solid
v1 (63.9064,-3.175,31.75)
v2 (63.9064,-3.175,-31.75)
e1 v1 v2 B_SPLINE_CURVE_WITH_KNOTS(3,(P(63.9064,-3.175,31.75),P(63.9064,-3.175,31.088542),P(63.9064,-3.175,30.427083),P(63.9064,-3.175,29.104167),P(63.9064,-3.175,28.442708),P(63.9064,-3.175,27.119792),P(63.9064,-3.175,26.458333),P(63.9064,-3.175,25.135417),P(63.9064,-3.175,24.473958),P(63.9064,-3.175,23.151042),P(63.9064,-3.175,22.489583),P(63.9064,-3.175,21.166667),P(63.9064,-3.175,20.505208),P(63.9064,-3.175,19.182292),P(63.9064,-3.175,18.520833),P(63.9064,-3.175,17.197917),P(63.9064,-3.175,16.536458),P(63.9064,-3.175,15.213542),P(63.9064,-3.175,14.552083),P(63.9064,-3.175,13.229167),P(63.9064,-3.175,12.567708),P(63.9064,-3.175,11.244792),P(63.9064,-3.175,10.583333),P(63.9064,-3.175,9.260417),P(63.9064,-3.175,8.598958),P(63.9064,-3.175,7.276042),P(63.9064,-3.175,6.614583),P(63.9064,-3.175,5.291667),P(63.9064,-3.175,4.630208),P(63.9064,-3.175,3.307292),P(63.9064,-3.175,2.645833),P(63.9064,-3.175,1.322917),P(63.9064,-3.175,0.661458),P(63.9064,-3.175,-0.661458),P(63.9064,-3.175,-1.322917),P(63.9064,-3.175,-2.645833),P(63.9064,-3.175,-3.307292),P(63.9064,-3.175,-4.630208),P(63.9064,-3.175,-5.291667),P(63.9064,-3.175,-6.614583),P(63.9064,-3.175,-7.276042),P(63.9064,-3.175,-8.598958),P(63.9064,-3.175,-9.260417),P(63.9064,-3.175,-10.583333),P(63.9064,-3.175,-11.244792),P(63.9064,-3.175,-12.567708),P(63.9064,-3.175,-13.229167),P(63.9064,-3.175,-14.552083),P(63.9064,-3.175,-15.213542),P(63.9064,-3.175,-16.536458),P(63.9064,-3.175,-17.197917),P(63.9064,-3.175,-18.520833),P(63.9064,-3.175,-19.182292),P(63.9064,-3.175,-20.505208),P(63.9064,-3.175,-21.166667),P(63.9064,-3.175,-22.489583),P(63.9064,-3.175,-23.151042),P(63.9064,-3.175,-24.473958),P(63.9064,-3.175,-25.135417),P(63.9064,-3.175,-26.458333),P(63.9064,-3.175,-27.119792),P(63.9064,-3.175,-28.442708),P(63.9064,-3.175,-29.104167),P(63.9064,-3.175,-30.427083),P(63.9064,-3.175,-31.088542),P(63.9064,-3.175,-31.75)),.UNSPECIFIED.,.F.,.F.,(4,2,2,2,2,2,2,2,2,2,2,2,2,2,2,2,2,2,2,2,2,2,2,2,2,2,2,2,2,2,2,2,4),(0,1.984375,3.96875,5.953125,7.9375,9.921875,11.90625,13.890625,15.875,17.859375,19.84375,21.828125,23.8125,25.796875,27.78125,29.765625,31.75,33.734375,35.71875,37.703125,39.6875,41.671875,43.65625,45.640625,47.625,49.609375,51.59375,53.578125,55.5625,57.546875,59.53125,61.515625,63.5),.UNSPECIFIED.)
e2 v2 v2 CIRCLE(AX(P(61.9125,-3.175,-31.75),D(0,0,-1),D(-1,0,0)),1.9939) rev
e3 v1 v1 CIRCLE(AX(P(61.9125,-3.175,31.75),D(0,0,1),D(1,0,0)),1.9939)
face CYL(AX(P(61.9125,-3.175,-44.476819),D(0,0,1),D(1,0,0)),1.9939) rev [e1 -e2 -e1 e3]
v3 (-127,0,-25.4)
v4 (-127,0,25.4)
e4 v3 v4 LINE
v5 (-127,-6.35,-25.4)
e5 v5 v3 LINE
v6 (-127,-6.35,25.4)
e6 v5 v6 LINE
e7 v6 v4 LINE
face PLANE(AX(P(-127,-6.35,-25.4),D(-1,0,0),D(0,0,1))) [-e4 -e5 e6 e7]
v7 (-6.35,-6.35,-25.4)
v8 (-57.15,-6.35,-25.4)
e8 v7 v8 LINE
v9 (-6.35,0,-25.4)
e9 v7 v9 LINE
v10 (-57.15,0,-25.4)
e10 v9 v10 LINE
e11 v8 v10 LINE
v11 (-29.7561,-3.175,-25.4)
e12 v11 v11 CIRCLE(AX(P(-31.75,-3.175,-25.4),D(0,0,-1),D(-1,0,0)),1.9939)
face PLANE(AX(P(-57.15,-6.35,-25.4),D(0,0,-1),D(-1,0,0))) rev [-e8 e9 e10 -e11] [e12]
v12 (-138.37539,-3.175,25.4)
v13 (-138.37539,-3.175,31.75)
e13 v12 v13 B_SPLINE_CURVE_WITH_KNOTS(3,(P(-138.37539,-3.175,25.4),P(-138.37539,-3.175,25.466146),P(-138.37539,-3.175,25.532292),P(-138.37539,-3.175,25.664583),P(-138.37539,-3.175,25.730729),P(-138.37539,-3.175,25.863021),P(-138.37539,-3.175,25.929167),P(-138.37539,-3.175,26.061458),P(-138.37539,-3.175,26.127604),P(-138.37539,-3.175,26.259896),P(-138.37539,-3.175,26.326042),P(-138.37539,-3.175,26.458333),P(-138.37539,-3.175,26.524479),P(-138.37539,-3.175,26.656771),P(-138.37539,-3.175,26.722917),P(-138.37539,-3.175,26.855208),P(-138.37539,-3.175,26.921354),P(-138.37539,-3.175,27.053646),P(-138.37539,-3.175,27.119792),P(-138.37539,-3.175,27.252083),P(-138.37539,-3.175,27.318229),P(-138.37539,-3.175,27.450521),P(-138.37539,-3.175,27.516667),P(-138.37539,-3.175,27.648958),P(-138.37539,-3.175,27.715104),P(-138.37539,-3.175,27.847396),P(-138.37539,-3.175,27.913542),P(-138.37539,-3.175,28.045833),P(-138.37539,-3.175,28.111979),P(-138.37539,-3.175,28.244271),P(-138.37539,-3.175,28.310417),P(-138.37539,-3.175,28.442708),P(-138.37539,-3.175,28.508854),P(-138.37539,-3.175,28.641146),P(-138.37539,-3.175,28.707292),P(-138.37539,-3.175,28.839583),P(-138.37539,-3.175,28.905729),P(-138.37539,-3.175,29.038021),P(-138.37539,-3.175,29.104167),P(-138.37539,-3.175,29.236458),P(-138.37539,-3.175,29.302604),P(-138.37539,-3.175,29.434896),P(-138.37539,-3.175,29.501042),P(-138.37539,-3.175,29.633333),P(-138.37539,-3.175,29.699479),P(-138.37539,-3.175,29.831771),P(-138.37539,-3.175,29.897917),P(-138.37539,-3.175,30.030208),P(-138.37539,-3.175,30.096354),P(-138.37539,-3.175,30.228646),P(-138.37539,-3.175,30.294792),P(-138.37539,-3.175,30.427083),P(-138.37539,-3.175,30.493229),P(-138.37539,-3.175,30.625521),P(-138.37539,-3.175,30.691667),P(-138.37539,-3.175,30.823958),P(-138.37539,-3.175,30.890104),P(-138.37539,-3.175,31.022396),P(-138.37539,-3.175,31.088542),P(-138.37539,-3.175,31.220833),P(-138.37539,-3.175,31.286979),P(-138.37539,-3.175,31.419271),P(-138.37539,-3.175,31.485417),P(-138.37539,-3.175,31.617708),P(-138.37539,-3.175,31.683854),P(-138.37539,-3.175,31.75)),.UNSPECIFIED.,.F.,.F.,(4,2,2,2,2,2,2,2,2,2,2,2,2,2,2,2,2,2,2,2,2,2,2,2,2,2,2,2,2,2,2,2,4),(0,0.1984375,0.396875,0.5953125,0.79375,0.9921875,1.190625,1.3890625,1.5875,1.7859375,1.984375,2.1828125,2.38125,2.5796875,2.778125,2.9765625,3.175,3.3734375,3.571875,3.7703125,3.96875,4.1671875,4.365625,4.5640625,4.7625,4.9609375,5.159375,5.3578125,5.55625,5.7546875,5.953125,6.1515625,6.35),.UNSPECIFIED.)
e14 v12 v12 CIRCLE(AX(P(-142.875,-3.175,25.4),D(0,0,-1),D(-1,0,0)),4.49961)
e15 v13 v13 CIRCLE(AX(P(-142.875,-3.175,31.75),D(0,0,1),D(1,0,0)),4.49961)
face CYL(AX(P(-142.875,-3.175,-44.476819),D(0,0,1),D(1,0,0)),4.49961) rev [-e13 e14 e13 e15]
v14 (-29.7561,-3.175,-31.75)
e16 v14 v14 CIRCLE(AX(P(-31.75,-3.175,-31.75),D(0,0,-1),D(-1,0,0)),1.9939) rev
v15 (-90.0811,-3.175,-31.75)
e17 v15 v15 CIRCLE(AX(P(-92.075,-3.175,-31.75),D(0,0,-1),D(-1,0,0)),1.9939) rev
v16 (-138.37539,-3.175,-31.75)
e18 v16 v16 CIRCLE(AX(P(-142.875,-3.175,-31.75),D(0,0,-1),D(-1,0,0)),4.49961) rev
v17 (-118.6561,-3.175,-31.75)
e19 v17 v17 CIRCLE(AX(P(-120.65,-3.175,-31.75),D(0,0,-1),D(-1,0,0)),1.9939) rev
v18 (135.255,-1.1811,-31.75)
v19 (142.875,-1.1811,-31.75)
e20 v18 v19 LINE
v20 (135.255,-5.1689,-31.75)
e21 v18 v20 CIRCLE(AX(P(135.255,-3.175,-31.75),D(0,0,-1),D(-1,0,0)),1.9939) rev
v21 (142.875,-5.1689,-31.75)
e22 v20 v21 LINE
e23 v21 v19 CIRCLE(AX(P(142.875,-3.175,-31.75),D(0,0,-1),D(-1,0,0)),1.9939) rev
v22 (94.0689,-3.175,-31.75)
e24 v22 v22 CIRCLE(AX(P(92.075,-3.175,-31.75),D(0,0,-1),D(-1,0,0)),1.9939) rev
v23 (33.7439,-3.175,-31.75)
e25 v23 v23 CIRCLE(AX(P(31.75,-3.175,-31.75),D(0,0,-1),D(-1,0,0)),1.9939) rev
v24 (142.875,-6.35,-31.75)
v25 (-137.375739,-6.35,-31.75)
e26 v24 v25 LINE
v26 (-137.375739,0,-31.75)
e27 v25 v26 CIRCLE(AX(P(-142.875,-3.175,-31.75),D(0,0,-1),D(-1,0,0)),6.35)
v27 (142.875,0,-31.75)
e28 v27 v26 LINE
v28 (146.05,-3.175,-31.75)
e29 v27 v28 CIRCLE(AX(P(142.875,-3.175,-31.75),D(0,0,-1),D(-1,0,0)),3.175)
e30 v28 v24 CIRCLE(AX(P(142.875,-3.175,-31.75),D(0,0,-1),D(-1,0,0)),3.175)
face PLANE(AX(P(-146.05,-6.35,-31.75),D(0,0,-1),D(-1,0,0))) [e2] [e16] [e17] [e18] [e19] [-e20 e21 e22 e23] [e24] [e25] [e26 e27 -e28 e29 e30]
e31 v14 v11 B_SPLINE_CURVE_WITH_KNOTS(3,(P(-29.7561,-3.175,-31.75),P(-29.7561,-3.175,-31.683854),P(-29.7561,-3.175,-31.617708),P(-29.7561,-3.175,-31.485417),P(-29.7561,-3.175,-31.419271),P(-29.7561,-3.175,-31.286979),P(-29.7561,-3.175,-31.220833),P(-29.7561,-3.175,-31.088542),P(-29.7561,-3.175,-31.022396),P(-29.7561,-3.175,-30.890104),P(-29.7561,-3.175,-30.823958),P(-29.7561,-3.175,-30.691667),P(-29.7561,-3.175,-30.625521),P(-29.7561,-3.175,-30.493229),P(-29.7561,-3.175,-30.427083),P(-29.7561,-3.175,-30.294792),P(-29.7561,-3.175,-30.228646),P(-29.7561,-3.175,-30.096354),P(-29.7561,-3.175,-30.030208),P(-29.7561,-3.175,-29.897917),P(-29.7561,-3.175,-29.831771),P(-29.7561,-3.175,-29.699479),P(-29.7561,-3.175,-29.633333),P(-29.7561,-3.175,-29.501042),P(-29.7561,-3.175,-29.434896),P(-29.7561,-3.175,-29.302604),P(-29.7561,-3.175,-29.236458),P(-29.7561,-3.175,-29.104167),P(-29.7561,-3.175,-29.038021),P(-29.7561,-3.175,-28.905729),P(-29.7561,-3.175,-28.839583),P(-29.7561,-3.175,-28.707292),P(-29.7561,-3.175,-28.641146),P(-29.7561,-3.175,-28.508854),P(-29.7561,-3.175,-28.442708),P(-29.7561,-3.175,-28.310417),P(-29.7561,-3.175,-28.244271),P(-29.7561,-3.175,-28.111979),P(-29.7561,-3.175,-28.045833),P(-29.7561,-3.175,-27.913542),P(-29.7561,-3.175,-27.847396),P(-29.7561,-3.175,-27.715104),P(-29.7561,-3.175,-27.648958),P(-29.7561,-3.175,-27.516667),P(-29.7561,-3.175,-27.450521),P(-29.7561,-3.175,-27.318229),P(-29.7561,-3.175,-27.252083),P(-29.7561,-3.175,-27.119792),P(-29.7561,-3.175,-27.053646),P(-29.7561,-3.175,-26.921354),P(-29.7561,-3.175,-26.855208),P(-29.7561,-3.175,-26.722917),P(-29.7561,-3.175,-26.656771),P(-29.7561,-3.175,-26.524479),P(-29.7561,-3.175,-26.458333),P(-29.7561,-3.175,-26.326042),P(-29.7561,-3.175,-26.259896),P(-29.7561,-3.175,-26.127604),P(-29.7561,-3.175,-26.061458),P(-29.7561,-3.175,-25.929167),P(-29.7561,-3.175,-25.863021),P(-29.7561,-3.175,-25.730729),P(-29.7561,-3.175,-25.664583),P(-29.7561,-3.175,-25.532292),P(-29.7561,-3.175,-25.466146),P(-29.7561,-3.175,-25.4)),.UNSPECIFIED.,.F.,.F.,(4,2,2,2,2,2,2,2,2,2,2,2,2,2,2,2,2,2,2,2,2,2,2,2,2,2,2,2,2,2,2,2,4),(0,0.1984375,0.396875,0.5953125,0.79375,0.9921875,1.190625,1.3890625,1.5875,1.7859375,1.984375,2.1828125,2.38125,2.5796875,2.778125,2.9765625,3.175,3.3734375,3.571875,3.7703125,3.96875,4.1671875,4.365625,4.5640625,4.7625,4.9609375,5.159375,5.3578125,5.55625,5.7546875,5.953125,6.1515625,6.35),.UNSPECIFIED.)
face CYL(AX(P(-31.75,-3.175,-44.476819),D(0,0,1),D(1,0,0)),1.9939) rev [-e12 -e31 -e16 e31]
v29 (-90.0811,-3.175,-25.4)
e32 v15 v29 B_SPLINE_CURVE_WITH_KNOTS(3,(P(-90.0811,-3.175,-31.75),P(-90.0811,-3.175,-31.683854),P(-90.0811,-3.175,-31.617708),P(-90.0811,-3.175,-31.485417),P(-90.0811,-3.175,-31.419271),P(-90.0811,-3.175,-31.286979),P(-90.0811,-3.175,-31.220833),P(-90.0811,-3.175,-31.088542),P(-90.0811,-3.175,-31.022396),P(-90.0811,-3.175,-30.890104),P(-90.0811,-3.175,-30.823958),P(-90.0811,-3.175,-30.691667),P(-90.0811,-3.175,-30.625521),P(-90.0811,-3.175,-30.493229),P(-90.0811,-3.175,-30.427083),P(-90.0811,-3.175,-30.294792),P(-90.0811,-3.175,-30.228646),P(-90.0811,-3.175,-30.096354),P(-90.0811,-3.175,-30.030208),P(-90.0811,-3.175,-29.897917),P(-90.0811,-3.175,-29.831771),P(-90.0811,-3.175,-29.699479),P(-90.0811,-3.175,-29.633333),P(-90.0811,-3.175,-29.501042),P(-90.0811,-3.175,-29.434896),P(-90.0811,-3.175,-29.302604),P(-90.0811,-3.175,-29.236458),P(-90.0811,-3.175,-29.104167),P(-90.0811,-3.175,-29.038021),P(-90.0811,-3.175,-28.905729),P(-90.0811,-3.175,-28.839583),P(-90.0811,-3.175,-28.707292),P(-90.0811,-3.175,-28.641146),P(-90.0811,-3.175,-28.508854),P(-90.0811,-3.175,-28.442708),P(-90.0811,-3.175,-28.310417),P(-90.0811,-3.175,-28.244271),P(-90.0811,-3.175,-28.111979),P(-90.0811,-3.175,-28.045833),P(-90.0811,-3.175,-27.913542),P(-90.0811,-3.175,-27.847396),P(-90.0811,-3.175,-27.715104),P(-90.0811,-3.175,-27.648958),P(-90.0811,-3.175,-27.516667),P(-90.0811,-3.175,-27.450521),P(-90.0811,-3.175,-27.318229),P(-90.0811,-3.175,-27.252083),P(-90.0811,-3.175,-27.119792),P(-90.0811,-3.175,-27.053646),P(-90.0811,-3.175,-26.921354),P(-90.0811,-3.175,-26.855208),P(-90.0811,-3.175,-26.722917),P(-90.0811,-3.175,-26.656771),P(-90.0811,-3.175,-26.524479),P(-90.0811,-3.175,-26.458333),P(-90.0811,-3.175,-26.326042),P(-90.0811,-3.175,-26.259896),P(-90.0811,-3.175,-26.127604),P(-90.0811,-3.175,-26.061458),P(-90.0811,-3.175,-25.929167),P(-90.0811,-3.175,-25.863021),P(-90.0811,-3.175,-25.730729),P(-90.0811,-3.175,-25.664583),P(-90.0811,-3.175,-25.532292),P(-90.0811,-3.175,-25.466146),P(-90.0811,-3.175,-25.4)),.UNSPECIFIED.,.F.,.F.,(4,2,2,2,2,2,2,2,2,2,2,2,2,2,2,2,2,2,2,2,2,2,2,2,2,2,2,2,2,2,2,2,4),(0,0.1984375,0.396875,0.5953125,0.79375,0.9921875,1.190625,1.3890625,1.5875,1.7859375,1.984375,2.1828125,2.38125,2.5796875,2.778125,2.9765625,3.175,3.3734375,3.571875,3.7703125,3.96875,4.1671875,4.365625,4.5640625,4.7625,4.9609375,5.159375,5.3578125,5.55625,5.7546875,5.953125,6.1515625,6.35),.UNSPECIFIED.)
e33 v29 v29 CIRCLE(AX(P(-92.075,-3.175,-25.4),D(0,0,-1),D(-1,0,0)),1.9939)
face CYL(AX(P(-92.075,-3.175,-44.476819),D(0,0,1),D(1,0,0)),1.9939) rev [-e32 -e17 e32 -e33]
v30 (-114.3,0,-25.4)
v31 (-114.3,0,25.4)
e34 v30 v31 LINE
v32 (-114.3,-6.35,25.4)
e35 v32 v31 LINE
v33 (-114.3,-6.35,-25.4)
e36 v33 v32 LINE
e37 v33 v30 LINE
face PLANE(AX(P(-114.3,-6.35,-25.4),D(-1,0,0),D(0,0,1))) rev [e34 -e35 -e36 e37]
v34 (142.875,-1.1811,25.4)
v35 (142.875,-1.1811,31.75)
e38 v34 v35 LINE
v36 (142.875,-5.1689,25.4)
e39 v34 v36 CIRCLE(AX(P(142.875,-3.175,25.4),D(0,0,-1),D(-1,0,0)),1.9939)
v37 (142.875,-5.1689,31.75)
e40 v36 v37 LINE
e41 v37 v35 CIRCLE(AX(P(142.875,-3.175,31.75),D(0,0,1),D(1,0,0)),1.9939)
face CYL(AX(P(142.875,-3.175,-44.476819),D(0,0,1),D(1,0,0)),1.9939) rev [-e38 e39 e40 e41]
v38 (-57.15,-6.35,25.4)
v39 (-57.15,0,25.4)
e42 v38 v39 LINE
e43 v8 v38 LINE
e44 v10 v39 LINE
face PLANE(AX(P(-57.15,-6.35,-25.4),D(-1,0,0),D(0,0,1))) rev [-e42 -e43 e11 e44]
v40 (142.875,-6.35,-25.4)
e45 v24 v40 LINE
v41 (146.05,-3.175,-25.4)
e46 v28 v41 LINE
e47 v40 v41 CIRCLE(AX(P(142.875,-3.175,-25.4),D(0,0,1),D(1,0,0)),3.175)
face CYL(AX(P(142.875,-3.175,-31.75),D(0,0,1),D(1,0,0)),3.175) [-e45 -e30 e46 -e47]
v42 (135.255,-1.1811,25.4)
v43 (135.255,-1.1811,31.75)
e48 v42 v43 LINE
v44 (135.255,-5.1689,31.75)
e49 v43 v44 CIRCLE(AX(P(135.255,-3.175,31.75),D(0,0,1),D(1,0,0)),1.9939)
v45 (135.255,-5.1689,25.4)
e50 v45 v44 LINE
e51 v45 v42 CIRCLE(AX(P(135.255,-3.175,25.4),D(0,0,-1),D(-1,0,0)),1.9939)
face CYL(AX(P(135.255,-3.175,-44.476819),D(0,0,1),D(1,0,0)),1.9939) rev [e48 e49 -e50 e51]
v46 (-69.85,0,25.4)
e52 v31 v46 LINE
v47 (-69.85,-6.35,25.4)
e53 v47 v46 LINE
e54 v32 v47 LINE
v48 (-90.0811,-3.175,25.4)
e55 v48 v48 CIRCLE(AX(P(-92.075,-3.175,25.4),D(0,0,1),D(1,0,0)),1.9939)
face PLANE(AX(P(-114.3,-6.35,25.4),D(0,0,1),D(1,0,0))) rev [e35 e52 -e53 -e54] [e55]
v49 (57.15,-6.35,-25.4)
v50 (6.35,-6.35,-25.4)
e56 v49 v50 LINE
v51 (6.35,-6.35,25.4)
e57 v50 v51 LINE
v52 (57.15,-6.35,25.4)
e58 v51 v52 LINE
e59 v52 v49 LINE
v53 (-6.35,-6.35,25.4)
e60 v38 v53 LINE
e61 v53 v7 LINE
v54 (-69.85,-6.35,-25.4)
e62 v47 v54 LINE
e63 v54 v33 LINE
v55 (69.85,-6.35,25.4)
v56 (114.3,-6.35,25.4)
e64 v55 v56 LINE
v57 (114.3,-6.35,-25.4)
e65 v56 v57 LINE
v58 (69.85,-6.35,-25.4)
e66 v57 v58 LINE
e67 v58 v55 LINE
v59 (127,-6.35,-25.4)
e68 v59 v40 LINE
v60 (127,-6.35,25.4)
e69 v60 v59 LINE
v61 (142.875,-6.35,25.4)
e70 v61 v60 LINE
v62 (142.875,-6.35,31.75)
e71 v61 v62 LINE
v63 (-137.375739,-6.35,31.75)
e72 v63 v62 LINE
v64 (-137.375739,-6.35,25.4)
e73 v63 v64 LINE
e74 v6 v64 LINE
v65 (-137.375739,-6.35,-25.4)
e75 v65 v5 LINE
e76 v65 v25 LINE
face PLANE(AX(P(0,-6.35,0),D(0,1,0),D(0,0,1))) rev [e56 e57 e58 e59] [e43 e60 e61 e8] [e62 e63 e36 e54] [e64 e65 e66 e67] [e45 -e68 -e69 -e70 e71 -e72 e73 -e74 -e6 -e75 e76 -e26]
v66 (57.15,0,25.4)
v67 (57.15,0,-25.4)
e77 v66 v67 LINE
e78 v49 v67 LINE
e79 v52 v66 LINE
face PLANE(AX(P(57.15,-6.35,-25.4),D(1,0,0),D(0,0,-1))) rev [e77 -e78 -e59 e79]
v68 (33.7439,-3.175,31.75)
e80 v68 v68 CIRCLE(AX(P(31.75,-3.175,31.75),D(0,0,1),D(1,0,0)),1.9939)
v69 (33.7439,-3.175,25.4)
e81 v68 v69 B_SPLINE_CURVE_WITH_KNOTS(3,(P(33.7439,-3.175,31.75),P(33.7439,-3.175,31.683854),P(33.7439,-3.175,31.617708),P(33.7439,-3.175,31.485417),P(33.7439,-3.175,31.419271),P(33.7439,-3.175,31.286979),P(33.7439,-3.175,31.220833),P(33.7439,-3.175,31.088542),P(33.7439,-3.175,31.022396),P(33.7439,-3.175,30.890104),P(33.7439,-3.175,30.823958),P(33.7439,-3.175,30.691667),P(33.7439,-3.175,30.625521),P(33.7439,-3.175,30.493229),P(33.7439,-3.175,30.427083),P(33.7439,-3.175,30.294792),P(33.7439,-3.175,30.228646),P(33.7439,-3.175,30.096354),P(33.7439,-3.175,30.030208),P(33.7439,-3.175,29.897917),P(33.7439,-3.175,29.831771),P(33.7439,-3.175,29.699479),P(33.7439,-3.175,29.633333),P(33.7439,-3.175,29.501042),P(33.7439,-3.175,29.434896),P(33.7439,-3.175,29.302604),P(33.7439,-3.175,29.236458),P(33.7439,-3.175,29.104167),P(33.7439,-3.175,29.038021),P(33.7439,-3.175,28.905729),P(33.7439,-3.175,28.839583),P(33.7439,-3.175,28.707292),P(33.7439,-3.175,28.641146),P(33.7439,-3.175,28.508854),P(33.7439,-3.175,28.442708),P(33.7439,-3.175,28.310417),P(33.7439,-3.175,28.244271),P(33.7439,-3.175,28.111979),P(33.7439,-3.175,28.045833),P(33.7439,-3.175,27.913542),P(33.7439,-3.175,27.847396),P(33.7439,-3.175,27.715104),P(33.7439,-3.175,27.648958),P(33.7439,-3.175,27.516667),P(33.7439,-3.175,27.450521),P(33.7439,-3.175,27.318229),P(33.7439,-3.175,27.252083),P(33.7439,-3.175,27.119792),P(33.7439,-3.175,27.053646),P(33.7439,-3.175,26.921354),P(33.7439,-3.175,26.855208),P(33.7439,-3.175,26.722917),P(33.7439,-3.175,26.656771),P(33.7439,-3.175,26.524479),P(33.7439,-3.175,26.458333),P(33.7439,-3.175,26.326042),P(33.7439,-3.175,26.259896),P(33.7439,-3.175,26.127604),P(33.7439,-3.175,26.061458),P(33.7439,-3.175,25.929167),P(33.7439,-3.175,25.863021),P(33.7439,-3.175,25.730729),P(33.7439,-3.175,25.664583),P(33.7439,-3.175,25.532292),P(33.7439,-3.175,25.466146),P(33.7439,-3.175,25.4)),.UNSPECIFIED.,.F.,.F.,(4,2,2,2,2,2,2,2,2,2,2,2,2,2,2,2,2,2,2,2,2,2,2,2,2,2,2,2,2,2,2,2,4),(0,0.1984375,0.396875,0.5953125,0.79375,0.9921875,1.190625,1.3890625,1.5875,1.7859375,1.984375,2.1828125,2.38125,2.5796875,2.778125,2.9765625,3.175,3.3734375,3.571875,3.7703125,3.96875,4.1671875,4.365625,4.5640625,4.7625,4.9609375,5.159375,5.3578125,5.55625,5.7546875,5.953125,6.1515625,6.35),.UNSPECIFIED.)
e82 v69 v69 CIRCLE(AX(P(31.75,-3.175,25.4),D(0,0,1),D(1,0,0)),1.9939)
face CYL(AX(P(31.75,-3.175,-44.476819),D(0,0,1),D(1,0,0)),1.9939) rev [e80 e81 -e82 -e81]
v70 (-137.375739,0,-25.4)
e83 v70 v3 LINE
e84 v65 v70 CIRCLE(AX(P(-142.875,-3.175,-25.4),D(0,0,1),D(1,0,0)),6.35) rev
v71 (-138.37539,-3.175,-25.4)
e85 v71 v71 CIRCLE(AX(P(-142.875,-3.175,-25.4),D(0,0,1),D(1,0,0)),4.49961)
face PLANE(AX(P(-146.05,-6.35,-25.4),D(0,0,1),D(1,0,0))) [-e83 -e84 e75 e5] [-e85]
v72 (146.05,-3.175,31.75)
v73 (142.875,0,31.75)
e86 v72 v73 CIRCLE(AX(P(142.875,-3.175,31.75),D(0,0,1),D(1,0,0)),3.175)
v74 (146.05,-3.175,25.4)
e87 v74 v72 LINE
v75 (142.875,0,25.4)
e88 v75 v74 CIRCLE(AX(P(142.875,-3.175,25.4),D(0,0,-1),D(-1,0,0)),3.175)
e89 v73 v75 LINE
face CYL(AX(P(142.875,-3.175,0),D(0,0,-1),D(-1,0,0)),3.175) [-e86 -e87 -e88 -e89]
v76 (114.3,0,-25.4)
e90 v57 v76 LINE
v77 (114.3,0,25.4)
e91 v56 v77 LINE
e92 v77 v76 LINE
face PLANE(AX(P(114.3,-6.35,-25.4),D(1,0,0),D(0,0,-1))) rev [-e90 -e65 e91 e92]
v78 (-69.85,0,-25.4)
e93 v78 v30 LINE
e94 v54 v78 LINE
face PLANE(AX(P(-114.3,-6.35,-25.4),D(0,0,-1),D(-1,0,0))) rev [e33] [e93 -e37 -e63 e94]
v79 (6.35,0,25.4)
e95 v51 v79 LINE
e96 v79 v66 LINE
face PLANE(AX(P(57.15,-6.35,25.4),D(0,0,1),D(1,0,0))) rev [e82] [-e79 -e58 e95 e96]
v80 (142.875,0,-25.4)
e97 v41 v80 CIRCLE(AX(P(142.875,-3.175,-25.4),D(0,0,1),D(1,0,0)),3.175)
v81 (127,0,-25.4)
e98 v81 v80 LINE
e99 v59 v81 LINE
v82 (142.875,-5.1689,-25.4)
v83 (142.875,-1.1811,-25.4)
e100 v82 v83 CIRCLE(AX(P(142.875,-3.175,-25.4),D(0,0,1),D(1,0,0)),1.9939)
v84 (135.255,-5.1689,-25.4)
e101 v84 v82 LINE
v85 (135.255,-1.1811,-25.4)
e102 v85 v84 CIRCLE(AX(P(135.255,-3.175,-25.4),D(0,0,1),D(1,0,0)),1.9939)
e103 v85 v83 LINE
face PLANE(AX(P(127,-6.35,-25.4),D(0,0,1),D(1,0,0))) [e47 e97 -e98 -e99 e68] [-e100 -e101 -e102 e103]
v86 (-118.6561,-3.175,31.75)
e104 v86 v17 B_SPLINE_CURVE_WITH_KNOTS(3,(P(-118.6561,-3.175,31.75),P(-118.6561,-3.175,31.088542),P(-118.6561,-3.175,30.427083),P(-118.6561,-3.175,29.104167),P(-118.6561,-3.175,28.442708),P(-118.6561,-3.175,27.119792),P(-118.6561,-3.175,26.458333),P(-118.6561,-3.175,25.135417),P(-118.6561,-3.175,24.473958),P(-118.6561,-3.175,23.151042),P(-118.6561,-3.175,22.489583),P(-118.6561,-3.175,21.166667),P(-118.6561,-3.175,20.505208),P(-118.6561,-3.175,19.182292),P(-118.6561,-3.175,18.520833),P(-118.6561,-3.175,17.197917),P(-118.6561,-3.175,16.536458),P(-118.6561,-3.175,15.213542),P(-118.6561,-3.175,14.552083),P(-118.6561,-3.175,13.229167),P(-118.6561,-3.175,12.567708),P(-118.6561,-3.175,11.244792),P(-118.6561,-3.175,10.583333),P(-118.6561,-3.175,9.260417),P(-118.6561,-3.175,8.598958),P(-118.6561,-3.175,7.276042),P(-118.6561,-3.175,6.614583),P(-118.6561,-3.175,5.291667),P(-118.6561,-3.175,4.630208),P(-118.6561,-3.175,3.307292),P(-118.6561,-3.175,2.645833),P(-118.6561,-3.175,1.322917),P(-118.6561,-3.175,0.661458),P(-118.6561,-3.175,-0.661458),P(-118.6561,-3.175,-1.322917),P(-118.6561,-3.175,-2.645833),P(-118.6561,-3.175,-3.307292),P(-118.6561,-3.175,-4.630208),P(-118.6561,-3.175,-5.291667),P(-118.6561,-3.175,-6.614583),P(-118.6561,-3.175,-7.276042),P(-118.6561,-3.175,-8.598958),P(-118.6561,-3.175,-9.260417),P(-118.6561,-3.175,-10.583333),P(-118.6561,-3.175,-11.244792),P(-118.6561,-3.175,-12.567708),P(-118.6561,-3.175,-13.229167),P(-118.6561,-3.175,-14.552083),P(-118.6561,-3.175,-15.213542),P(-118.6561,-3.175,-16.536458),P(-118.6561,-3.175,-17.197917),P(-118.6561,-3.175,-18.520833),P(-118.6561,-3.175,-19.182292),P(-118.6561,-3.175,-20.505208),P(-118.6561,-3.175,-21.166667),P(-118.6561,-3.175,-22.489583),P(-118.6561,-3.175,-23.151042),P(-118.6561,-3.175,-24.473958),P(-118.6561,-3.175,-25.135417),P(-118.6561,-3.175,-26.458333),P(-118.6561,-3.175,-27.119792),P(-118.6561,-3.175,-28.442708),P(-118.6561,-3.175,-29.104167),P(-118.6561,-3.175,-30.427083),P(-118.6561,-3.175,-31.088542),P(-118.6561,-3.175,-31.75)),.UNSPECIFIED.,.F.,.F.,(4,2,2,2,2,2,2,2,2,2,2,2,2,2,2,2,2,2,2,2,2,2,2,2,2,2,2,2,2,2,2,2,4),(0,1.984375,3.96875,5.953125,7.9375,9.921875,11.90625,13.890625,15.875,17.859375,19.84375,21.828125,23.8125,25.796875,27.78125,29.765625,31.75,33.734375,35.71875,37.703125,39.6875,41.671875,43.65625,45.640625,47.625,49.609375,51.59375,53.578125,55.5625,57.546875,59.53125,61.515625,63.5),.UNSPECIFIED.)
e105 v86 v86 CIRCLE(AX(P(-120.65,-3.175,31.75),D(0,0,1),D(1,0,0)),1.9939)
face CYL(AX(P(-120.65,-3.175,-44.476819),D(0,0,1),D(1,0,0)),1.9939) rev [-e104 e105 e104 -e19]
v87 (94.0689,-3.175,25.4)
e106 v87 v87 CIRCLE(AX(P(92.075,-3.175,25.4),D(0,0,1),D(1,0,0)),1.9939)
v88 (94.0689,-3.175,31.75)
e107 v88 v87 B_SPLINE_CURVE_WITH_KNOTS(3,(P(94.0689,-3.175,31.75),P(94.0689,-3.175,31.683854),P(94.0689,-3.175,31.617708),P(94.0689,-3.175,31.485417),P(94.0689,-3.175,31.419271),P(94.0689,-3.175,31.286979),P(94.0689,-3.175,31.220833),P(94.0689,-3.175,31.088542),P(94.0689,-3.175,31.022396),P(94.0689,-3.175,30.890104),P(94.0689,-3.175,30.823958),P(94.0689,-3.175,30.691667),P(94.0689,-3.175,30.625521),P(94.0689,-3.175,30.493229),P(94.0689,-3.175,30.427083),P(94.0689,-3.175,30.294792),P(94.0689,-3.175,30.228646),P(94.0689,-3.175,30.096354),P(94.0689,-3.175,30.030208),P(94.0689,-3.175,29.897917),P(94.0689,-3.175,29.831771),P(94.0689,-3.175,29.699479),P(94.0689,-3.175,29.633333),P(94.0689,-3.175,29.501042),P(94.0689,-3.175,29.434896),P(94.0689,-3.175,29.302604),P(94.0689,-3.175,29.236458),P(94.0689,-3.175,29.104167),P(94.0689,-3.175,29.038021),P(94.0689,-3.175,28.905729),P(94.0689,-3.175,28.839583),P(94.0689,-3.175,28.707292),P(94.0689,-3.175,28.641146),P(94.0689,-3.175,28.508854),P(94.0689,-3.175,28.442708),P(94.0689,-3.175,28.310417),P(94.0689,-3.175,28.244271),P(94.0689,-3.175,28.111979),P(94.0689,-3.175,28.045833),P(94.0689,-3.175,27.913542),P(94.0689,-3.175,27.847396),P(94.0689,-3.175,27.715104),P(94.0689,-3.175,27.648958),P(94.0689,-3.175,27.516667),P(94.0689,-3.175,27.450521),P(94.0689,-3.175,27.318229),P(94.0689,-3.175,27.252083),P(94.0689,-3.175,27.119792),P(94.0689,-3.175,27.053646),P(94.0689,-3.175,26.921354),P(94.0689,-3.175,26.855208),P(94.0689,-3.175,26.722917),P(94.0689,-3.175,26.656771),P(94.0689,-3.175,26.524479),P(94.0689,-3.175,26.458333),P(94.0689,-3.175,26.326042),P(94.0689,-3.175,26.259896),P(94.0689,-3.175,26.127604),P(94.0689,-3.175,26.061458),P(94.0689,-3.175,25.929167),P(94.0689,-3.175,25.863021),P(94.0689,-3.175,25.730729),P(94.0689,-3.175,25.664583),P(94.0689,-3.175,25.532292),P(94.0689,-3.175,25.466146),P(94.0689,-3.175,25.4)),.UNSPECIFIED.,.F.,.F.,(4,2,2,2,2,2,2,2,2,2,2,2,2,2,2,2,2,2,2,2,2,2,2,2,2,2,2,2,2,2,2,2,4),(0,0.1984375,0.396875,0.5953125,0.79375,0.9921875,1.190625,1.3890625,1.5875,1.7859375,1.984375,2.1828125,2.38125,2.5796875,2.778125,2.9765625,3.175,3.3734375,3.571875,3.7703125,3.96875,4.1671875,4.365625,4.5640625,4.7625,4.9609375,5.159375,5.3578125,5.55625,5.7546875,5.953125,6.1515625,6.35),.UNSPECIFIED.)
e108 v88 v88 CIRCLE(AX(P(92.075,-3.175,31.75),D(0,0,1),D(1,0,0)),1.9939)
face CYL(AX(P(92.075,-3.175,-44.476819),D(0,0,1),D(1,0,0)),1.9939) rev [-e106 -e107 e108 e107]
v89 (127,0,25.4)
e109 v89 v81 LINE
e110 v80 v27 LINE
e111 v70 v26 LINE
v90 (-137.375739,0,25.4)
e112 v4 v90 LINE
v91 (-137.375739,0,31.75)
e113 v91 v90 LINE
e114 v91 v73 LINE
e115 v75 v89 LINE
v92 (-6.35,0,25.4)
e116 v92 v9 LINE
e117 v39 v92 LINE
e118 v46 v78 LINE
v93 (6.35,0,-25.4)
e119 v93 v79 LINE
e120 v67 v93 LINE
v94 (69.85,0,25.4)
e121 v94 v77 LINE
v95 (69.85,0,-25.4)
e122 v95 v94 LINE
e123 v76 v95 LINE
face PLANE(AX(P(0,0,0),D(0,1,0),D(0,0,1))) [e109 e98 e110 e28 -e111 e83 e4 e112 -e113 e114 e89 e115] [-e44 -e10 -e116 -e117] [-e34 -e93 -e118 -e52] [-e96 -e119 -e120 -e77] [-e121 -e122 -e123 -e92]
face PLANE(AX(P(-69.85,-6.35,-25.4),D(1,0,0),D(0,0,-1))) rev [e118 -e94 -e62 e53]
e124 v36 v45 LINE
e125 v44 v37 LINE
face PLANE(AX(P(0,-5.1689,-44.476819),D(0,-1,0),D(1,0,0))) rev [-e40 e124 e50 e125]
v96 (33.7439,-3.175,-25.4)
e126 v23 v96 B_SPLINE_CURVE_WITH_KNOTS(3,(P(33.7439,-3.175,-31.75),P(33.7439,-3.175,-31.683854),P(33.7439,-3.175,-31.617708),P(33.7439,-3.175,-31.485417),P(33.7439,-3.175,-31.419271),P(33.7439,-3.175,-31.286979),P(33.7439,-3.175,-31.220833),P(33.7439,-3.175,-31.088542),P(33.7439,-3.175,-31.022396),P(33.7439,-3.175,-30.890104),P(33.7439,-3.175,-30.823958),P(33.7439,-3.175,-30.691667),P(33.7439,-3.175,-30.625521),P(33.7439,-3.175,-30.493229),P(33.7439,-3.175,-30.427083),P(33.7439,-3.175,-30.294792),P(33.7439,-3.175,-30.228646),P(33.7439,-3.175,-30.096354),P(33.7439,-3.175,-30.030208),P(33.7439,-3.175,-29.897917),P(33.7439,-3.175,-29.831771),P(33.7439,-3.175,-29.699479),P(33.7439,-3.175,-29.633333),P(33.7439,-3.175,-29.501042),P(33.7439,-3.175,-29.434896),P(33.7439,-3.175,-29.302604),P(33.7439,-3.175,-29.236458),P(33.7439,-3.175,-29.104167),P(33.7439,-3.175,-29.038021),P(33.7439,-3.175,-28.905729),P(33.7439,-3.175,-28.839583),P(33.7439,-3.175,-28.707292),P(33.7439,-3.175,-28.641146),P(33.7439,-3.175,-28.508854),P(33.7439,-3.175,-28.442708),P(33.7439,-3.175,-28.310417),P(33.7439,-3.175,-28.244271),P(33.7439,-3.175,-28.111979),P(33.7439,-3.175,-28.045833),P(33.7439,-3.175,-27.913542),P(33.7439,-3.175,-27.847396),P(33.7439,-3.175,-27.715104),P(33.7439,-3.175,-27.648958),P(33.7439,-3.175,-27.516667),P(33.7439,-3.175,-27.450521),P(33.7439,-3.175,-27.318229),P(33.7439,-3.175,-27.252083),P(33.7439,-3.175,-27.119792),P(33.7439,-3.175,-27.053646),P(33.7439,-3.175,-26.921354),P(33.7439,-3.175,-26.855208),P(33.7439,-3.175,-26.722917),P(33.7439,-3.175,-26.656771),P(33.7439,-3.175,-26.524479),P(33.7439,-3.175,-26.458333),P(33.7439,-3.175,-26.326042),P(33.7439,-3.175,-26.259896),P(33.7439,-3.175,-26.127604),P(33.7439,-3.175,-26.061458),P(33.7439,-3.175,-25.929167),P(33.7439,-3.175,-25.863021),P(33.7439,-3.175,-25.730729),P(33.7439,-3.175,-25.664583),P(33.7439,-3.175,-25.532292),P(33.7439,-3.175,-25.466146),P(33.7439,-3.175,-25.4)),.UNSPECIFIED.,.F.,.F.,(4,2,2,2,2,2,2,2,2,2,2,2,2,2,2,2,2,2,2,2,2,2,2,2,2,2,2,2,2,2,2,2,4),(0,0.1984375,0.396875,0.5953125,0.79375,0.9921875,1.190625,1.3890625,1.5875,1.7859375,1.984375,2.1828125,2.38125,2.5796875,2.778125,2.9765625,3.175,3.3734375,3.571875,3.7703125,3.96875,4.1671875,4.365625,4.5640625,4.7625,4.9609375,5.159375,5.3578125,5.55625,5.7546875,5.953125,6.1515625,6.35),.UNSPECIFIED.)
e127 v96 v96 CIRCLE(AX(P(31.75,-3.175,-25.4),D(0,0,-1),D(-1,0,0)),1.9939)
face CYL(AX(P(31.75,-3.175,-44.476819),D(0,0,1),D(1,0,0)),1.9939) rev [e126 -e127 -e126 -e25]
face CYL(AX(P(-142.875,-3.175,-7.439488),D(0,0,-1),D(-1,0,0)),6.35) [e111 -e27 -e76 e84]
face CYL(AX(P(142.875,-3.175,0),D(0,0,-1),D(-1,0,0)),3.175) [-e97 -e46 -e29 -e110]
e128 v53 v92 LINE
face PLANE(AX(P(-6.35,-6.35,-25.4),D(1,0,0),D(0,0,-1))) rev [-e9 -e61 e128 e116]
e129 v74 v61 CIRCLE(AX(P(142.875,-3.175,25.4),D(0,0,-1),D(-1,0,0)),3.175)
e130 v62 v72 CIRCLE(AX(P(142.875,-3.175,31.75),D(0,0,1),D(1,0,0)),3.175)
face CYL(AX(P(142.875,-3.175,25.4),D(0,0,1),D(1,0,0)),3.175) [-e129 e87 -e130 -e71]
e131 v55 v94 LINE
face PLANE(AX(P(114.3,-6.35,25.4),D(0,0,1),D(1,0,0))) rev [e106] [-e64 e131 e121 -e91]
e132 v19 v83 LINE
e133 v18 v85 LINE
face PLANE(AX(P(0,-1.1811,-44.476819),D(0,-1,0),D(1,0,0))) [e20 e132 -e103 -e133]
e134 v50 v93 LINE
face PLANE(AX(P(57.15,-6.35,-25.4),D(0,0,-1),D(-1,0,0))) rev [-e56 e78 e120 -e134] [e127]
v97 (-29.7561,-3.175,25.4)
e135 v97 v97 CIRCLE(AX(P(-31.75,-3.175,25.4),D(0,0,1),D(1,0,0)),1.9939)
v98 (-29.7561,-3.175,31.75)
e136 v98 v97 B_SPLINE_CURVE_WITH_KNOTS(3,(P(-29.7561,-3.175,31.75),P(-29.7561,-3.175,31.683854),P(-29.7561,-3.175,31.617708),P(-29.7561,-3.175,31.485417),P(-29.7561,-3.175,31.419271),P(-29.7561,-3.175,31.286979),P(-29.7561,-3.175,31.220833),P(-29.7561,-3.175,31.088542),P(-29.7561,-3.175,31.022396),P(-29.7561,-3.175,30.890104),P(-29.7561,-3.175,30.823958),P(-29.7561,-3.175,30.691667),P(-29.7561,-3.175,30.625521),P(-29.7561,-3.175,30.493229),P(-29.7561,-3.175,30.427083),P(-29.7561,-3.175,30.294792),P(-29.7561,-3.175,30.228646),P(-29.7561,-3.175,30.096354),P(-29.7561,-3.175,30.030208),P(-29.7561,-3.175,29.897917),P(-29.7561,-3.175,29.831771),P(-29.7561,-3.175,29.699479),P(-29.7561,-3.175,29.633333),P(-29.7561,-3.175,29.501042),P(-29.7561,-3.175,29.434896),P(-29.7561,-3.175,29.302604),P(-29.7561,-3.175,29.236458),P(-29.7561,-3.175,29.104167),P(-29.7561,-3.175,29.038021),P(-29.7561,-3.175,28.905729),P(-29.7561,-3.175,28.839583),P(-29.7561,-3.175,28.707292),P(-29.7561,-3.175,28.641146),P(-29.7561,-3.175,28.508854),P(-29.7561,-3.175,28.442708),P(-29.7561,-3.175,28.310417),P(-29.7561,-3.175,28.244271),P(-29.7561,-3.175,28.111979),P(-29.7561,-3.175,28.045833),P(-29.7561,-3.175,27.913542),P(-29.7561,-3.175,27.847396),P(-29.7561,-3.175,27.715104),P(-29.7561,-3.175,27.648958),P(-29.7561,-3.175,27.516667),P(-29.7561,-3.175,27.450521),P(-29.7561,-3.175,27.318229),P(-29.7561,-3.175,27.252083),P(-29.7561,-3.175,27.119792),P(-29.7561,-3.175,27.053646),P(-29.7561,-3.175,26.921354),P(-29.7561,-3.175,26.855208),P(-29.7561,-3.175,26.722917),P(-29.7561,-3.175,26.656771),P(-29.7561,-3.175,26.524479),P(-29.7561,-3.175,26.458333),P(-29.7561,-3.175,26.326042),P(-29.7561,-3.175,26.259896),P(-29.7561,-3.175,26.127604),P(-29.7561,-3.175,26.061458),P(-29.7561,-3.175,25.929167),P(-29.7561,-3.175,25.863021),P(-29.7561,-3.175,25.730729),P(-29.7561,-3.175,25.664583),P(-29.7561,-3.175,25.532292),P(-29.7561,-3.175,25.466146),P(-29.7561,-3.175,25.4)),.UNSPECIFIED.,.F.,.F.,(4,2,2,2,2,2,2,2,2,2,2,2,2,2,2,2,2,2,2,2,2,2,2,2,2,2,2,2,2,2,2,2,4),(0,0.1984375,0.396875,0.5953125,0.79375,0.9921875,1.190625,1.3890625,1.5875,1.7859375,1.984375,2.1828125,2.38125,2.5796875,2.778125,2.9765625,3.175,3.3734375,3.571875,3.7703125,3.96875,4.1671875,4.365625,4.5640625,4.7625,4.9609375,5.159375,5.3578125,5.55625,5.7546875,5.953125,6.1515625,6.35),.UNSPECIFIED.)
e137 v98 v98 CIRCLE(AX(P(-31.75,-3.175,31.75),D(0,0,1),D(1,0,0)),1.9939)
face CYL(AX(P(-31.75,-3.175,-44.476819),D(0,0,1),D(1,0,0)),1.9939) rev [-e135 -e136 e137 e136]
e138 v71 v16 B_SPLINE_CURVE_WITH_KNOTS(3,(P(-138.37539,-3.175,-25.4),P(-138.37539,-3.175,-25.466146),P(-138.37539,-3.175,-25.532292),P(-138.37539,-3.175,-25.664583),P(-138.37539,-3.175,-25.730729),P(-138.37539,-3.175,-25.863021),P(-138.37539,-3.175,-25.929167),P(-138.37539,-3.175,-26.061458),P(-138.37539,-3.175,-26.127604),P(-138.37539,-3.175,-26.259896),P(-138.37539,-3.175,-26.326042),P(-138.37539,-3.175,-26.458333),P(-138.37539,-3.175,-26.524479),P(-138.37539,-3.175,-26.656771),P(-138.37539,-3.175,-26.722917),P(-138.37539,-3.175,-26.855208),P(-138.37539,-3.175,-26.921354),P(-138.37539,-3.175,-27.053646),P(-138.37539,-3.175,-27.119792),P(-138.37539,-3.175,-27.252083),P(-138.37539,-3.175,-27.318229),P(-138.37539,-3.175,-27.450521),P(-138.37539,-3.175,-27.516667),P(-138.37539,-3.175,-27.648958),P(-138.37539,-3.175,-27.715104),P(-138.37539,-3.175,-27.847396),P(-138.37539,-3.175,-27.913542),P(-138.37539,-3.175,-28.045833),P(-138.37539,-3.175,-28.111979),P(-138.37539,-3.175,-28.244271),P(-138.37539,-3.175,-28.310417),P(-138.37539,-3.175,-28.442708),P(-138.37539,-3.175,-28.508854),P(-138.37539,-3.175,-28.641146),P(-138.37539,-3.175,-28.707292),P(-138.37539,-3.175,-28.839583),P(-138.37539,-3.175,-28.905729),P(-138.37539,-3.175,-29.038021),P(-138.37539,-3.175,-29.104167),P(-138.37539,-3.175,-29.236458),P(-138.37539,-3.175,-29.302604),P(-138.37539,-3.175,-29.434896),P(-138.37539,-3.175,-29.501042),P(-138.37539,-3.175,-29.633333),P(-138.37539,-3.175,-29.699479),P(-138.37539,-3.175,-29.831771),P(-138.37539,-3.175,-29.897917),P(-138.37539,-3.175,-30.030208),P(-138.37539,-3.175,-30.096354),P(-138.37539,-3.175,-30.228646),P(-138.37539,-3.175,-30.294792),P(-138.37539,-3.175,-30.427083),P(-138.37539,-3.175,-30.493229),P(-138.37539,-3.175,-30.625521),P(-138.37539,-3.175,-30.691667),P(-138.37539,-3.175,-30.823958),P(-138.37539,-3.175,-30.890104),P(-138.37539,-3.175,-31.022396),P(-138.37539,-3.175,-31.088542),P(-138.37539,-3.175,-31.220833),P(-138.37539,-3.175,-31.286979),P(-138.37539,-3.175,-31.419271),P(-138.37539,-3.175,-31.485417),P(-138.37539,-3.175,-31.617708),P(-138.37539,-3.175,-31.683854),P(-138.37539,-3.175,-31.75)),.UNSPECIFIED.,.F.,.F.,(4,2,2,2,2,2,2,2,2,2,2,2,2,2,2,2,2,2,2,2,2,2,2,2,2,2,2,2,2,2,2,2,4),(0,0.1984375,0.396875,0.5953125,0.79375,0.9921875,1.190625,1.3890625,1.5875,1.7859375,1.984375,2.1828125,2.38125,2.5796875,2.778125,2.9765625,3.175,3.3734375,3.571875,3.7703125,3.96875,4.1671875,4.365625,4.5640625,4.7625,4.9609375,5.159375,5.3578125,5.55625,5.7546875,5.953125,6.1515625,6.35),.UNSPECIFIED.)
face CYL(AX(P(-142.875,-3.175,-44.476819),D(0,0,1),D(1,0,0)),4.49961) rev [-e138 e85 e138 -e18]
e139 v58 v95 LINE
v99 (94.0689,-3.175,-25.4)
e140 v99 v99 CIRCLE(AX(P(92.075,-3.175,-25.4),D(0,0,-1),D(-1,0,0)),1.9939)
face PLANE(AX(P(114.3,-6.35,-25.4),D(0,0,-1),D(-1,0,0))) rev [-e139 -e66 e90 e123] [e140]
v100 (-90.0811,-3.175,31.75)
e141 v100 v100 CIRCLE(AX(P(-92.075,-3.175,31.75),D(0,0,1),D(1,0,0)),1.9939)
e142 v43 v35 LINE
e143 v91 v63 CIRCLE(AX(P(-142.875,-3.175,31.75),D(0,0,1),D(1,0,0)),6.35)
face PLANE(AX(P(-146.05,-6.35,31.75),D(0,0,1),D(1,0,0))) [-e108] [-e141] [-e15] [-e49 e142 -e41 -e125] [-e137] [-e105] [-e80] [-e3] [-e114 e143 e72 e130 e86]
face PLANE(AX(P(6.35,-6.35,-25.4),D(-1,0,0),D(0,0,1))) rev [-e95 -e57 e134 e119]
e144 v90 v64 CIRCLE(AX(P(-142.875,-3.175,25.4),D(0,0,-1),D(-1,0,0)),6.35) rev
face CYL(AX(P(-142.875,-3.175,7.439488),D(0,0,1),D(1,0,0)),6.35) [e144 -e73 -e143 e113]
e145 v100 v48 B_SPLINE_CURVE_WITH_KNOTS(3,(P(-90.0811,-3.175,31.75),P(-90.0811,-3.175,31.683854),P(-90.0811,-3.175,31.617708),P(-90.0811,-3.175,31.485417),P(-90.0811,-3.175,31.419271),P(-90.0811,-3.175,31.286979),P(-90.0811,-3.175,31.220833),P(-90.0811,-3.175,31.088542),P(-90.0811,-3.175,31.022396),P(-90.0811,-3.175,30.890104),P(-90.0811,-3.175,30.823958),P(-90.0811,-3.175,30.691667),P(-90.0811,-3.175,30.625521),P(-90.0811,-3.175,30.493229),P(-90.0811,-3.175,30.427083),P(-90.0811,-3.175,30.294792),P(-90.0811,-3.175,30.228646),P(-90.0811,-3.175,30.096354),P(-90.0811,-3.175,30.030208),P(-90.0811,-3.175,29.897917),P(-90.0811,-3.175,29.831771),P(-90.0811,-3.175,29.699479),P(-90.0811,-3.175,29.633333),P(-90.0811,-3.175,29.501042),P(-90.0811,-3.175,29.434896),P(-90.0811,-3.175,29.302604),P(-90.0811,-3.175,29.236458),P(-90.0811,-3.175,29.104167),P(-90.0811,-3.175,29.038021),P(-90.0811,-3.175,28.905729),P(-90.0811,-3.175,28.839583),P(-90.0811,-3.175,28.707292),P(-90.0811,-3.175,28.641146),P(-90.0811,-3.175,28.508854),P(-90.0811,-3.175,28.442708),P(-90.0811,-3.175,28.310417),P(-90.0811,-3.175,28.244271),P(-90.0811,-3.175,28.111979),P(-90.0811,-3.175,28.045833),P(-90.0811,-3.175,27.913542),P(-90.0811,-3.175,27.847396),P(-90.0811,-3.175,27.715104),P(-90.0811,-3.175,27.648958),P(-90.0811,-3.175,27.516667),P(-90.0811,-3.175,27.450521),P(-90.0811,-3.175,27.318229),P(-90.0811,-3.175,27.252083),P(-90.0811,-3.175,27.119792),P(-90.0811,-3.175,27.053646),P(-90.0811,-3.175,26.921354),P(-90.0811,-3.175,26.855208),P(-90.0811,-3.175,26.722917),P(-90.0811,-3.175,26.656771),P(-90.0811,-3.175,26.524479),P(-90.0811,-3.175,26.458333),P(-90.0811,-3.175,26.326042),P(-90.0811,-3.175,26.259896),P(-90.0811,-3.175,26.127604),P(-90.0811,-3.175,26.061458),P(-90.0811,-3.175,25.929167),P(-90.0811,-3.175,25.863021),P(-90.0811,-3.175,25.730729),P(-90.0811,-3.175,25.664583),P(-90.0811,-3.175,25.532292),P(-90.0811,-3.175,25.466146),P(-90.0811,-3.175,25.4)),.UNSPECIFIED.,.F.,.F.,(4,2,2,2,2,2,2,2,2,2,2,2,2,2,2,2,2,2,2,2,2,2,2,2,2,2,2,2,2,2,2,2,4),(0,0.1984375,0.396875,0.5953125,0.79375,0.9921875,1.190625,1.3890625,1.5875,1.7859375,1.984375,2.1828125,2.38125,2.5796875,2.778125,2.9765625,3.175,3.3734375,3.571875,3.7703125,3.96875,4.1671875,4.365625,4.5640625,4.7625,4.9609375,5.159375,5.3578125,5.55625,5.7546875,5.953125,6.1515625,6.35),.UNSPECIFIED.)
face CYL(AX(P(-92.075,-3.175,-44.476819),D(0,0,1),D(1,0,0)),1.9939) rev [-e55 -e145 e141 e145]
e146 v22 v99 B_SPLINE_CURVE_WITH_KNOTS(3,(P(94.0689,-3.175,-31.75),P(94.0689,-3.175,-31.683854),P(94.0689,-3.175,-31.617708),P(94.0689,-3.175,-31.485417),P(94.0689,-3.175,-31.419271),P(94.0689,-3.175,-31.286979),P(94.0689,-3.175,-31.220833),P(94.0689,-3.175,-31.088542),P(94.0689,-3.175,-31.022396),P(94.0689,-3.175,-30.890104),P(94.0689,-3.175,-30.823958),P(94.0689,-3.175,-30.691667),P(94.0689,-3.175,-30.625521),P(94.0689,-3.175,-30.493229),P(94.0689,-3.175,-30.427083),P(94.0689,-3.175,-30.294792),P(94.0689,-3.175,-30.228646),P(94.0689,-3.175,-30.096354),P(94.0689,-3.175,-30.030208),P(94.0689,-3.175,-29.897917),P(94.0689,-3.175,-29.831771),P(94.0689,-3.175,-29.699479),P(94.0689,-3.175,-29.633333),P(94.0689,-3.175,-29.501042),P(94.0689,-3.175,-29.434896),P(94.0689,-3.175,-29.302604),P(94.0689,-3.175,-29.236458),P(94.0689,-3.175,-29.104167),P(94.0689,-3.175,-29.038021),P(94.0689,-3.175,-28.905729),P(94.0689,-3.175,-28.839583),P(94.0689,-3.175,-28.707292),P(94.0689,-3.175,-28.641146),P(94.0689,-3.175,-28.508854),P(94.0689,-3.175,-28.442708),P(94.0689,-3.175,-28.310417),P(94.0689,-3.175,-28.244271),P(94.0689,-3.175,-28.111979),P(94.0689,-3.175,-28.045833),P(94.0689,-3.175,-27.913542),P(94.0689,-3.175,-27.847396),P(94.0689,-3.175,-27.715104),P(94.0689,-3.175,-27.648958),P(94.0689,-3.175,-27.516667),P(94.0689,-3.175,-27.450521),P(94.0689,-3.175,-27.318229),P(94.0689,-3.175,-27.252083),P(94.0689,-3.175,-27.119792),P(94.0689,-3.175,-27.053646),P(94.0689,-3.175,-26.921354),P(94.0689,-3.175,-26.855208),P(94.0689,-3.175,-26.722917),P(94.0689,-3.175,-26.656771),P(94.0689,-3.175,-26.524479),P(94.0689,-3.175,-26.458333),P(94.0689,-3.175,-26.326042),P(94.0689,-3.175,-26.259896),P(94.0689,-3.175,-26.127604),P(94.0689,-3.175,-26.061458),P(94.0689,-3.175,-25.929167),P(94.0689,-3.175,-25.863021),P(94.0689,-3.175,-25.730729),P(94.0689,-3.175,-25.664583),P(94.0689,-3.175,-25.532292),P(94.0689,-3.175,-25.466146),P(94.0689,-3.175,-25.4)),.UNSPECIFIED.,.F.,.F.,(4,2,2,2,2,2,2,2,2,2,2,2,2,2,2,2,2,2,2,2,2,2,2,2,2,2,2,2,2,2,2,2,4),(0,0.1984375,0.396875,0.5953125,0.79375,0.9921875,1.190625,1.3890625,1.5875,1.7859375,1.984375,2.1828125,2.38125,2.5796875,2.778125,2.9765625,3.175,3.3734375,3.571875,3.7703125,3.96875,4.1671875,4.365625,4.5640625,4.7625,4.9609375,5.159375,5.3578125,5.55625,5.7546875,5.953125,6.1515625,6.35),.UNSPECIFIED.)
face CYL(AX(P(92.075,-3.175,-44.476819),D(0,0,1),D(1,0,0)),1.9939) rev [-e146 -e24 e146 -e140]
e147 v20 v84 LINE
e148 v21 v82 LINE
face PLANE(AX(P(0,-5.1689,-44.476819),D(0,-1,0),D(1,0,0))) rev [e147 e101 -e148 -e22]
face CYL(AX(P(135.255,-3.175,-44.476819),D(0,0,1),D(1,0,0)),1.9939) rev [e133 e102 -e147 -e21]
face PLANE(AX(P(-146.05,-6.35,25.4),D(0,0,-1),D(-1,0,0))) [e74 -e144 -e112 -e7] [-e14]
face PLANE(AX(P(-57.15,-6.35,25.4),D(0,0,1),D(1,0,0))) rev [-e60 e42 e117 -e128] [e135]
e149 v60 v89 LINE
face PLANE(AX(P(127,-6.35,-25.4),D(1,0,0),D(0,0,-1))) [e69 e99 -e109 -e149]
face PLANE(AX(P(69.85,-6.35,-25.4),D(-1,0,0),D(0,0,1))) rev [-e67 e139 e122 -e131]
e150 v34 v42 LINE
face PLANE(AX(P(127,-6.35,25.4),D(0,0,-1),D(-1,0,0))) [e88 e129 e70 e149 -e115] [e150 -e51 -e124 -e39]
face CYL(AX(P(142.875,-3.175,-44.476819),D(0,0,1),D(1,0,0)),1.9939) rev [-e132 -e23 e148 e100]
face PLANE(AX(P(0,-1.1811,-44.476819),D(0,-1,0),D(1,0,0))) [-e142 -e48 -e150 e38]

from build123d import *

# Parameters (mm, degrees)
SKETCH1_W           = 50.8
SKETCH1_H           = 50.8
SKETCH1_W_2         = 44.45
BOSS_EXTRUDE1_DEPTH = 6.35
FILLET2_R           = 3.175
SKETCH2_R           = 6.35
BOSS_EXTRUDE3_DEPTH = 6.35
BOSS_EXTRUDE4_START = -6.35
SKETCH4_R           = 6.35
BOSS_EXTRUDE4_DEPTH = 6.35
CUT_EXTRUDE1_REACH  = 164.453
SKETCH2_4_R         = 4.49961
SKETCH2_4_R_2       = 1.9939


with BuildPart() as part:
    # Sketch1 → Boss-Extrude1 (new body)
    with BuildSketch(Plane(origin=(0, 0, 0), x_dir=(1, 0, 0), z_dir=(0, 1, 0))):
        Polygon((-146.05, 25.4), (-127, 25.4), (-127, -25.4), (-146.05, -25.4), (-146.05, -31.75), (146.05, -31.75), (146.05, -25.4), (127, -25.4), (127, 25.4), (146.05, 25.4), (146.05, 31.75), (-146.05, 31.75), align=None)
        with Locations((-31.75, 0)):
            Rectangle(SKETCH1_W, SKETCH1_H, mode=Mode.SUBTRACT)
        with Locations((-92.075, 0)):
            Rectangle(SKETCH1_W_2, SKETCH1_H, mode=Mode.SUBTRACT)
        with Locations((31.75, 0)):
            Rectangle(SKETCH1_W, SKETCH1_H, mode=Mode.SUBTRACT)
        with Locations((92.075, 0)):
            Rectangle(SKETCH1_W_2, SKETCH1_H, mode=Mode.SUBTRACT)
    extrude(amount=-BOSS_EXTRUDE1_DEPTH)

    # Fillet2
    fillet2_edges = [part.edges().sort_by_distance(p)[0] for p in [
        (-146.05, -6.35, 28.575),
        (-146.05, 0, 28.575),
        (-146.05, -6.35, -28.575),
        (-146.05, 0, -28.575),
        (146.05, -6.35, -28.575),
        (146.05, 0, -28.575),
        (146.05, -6.35, 28.575),
        (146.05, 0, 28.575),
    ]]
    fillet(fillet2_edges, radius=FILLET2_R - 0.0001)  # a hair under: the kernel refuses the full size

    # Sketch2 → Boss-Extrude3 (add)
    with BuildSketch(Plane.XY.offset(31.75)):
        with Locations((-142.875, -3.175)):
            Circle(SKETCH2_R)
    extrude(amount=-BOSS_EXTRUDE3_DEPTH)

    # Sketch4 → Boss-Extrude4 (add)
    with BuildSketch(Plane(origin=(0, 0, -31.75), x_dir=(-1, 0, 0), z_dir=(0, 0, -1)).offset(BOSS_EXTRUDE4_START)):
        with Locations((142.875, -3.175)):
            Circle(SKETCH4_R)
    extrude(amount=BOSS_EXTRUDE4_DEPTH)

    # Cut-Extrude1: up to this face of the body (flat: up to its plane)
    cut_extrude1_end = Plane(part.part.faces().sort_by_distance((-5.43222234, -3.175, -31.75))[0])
    # Sketch2<4> → Cut-Extrude1 (cut, up to the picked face)
    with BuildSketch(Plane.XY.offset(31.75), mode=Mode.PRIVATE) as cut_extrude1_sk1:
        with Locations((-142.875, -3.175)):
            Circle(SKETCH2_4_R)
    cut_extrude1_tool1 = split(extrude(cut_extrude1_sk1.sketch, amount=-CUT_EXTRUDE1_REACH, mode=Mode.PRIVATE), bisect_by=cut_extrude1_end, keep=Keep.BOTH, mode=Mode.PRIVATE)
    # Sketch2<4> → Cut-Extrude1 (cut, up to the picked face)
    with BuildSketch(Plane.XY.offset(31.75), mode=Mode.PRIVATE) as cut_extrude1_sk2:
        with Locations((-92.075, -3.175)):
            Circle(SKETCH2_4_R_2)
    cut_extrude1_tool2 = split(extrude(cut_extrude1_sk2.sketch, amount=-CUT_EXTRUDE1_REACH, mode=Mode.PRIVATE), bisect_by=cut_extrude1_end, keep=Keep.BOTH, mode=Mode.PRIVATE)
    # Sketch2<4> → Cut-Extrude1 (cut, up to the picked face)
    with BuildSketch(Plane.XY.offset(31.75), mode=Mode.PRIVATE) as cut_extrude1_sk3:
        with Locations((-31.75, -3.175)):
            Circle(SKETCH2_4_R_2)
    cut_extrude1_tool3 = split(extrude(cut_extrude1_sk3.sketch, amount=-CUT_EXTRUDE1_REACH, mode=Mode.PRIVATE), bisect_by=cut_extrude1_end, keep=Keep.BOTH, mode=Mode.PRIVATE)
    # Sketch2<4> → Cut-Extrude1 (cut, up to the picked face)
    with BuildSketch(Plane.XY.offset(31.75), mode=Mode.PRIVATE) as cut_extrude1_sk4:
        with Locations((31.75, -3.175)):
            Circle(SKETCH2_4_R_2)
    cut_extrude1_tool4 = split(extrude(cut_extrude1_sk4.sketch, amount=-CUT_EXTRUDE1_REACH, mode=Mode.PRIVATE), bisect_by=cut_extrude1_end, keep=Keep.BOTH, mode=Mode.PRIVATE)
    # Sketch2<4> → Cut-Extrude1 (cut, up to the picked face)
    with BuildSketch(Plane.XY.offset(31.75), mode=Mode.PRIVATE) as cut_extrude1_sk5:
        with Locations((92.075, -3.175)):
            Circle(SKETCH2_4_R_2)
    cut_extrude1_tool5 = split(extrude(cut_extrude1_sk5.sketch, amount=-CUT_EXTRUDE1_REACH, mode=Mode.PRIVATE), bisect_by=cut_extrude1_end, keep=Keep.BOTH, mode=Mode.PRIVATE)
    # Sketch2<4> → Cut-Extrude1 (cut, up to the picked face)
    with BuildSketch(Plane.XY.offset(31.75), mode=Mode.PRIVATE) as cut_extrude1_sk6:
        with Locations((-120.65, -3.175)):
            Circle(SKETCH2_4_R_2)
    cut_extrude1_tool6 = split(extrude(cut_extrude1_sk6.sketch, amount=-CUT_EXTRUDE1_REACH, mode=Mode.PRIVATE), bisect_by=cut_extrude1_end, keep=Keep.BOTH, mode=Mode.PRIVATE)
    # Sketch2<4> → Cut-Extrude1 (cut, up to the picked face)
    with BuildSketch(Plane.XY.offset(31.75), mode=Mode.PRIVATE) as cut_extrude1_sk7:
        with Locations((61.9125, -3.175)):
            Circle(SKETCH2_4_R_2)
    cut_extrude1_tool7 = split(extrude(cut_extrude1_sk7.sketch, amount=-CUT_EXTRUDE1_REACH, mode=Mode.PRIVATE), bisect_by=cut_extrude1_end, keep=Keep.BOTH, mode=Mode.PRIVATE)
    # Sketch2<4> → Cut-Extrude1 (cut, up to the picked face)
    with BuildSketch(Plane.XY.offset(31.75), mode=Mode.PRIVATE) as cut_extrude1_sk8:
        with BuildLine():
            Line((135.255, -1.1811), (142.875, -1.1811))
            ThreePointArc((142.875, -1.1811), (144.8689, -3.175), (142.875, -5.1689))
            Line((142.875, -5.1689), (135.255, -5.1689))
            ThreePointArc((135.255, -5.1689), (133.2611, -3.175), (135.255, -1.1811))
        make_face()
    cut_extrude1_tool8 = split(extrude(cut_extrude1_sk8.sketch, amount=-CUT_EXTRUDE1_REACH, mode=Mode.PRIVATE), bisect_by=cut_extrude1_end, keep=Keep.BOTH, mode=Mode.PRIVATE)
    add(cut_extrude1_tool1.solids().sort_by(Axis((-142.875, -3.175, 31.75), (0, 0, -1)))[0], mode=Mode.SUBTRACT)
    add(cut_extrude1_tool2.solids().sort_by(Axis((-92.075, -3.175, 31.75), (0, 0, -1)))[0], mode=Mode.SUBTRACT)
    add(cut_extrude1_tool3.solids().sort_by(Axis((-31.75, -3.175, 31.75), (0, 0, -1)))[0], mode=Mode.SUBTRACT)
    add(cut_extrude1_tool4.solids().sort_by(Axis((31.75, -3.175, 31.75), (0, 0, -1)))[0], mode=Mode.SUBTRACT)
    add(cut_extrude1_tool5.solids().sort_by(Axis((92.075, -3.175, 31.75), (0, 0, -1)))[0], mode=Mode.SUBTRACT)
    add(cut_extrude1_tool6.solids().sort_by(Axis((-120.65, -3.175, 31.75), (0, 0, -1)))[0], mode=Mode.SUBTRACT)
    add(cut_extrude1_tool7.solids().sort_by(Axis((61.9125, -3.175, 31.75), (0, 0, -1)))[0], mode=Mode.SUBTRACT)
    add(cut_extrude1_tool8.solids().sort_by(Axis((139.065, -3.175, 31.75), (0, 0, -1)))[0], mode=Mode.SUBTRACT)


solid = part.part
